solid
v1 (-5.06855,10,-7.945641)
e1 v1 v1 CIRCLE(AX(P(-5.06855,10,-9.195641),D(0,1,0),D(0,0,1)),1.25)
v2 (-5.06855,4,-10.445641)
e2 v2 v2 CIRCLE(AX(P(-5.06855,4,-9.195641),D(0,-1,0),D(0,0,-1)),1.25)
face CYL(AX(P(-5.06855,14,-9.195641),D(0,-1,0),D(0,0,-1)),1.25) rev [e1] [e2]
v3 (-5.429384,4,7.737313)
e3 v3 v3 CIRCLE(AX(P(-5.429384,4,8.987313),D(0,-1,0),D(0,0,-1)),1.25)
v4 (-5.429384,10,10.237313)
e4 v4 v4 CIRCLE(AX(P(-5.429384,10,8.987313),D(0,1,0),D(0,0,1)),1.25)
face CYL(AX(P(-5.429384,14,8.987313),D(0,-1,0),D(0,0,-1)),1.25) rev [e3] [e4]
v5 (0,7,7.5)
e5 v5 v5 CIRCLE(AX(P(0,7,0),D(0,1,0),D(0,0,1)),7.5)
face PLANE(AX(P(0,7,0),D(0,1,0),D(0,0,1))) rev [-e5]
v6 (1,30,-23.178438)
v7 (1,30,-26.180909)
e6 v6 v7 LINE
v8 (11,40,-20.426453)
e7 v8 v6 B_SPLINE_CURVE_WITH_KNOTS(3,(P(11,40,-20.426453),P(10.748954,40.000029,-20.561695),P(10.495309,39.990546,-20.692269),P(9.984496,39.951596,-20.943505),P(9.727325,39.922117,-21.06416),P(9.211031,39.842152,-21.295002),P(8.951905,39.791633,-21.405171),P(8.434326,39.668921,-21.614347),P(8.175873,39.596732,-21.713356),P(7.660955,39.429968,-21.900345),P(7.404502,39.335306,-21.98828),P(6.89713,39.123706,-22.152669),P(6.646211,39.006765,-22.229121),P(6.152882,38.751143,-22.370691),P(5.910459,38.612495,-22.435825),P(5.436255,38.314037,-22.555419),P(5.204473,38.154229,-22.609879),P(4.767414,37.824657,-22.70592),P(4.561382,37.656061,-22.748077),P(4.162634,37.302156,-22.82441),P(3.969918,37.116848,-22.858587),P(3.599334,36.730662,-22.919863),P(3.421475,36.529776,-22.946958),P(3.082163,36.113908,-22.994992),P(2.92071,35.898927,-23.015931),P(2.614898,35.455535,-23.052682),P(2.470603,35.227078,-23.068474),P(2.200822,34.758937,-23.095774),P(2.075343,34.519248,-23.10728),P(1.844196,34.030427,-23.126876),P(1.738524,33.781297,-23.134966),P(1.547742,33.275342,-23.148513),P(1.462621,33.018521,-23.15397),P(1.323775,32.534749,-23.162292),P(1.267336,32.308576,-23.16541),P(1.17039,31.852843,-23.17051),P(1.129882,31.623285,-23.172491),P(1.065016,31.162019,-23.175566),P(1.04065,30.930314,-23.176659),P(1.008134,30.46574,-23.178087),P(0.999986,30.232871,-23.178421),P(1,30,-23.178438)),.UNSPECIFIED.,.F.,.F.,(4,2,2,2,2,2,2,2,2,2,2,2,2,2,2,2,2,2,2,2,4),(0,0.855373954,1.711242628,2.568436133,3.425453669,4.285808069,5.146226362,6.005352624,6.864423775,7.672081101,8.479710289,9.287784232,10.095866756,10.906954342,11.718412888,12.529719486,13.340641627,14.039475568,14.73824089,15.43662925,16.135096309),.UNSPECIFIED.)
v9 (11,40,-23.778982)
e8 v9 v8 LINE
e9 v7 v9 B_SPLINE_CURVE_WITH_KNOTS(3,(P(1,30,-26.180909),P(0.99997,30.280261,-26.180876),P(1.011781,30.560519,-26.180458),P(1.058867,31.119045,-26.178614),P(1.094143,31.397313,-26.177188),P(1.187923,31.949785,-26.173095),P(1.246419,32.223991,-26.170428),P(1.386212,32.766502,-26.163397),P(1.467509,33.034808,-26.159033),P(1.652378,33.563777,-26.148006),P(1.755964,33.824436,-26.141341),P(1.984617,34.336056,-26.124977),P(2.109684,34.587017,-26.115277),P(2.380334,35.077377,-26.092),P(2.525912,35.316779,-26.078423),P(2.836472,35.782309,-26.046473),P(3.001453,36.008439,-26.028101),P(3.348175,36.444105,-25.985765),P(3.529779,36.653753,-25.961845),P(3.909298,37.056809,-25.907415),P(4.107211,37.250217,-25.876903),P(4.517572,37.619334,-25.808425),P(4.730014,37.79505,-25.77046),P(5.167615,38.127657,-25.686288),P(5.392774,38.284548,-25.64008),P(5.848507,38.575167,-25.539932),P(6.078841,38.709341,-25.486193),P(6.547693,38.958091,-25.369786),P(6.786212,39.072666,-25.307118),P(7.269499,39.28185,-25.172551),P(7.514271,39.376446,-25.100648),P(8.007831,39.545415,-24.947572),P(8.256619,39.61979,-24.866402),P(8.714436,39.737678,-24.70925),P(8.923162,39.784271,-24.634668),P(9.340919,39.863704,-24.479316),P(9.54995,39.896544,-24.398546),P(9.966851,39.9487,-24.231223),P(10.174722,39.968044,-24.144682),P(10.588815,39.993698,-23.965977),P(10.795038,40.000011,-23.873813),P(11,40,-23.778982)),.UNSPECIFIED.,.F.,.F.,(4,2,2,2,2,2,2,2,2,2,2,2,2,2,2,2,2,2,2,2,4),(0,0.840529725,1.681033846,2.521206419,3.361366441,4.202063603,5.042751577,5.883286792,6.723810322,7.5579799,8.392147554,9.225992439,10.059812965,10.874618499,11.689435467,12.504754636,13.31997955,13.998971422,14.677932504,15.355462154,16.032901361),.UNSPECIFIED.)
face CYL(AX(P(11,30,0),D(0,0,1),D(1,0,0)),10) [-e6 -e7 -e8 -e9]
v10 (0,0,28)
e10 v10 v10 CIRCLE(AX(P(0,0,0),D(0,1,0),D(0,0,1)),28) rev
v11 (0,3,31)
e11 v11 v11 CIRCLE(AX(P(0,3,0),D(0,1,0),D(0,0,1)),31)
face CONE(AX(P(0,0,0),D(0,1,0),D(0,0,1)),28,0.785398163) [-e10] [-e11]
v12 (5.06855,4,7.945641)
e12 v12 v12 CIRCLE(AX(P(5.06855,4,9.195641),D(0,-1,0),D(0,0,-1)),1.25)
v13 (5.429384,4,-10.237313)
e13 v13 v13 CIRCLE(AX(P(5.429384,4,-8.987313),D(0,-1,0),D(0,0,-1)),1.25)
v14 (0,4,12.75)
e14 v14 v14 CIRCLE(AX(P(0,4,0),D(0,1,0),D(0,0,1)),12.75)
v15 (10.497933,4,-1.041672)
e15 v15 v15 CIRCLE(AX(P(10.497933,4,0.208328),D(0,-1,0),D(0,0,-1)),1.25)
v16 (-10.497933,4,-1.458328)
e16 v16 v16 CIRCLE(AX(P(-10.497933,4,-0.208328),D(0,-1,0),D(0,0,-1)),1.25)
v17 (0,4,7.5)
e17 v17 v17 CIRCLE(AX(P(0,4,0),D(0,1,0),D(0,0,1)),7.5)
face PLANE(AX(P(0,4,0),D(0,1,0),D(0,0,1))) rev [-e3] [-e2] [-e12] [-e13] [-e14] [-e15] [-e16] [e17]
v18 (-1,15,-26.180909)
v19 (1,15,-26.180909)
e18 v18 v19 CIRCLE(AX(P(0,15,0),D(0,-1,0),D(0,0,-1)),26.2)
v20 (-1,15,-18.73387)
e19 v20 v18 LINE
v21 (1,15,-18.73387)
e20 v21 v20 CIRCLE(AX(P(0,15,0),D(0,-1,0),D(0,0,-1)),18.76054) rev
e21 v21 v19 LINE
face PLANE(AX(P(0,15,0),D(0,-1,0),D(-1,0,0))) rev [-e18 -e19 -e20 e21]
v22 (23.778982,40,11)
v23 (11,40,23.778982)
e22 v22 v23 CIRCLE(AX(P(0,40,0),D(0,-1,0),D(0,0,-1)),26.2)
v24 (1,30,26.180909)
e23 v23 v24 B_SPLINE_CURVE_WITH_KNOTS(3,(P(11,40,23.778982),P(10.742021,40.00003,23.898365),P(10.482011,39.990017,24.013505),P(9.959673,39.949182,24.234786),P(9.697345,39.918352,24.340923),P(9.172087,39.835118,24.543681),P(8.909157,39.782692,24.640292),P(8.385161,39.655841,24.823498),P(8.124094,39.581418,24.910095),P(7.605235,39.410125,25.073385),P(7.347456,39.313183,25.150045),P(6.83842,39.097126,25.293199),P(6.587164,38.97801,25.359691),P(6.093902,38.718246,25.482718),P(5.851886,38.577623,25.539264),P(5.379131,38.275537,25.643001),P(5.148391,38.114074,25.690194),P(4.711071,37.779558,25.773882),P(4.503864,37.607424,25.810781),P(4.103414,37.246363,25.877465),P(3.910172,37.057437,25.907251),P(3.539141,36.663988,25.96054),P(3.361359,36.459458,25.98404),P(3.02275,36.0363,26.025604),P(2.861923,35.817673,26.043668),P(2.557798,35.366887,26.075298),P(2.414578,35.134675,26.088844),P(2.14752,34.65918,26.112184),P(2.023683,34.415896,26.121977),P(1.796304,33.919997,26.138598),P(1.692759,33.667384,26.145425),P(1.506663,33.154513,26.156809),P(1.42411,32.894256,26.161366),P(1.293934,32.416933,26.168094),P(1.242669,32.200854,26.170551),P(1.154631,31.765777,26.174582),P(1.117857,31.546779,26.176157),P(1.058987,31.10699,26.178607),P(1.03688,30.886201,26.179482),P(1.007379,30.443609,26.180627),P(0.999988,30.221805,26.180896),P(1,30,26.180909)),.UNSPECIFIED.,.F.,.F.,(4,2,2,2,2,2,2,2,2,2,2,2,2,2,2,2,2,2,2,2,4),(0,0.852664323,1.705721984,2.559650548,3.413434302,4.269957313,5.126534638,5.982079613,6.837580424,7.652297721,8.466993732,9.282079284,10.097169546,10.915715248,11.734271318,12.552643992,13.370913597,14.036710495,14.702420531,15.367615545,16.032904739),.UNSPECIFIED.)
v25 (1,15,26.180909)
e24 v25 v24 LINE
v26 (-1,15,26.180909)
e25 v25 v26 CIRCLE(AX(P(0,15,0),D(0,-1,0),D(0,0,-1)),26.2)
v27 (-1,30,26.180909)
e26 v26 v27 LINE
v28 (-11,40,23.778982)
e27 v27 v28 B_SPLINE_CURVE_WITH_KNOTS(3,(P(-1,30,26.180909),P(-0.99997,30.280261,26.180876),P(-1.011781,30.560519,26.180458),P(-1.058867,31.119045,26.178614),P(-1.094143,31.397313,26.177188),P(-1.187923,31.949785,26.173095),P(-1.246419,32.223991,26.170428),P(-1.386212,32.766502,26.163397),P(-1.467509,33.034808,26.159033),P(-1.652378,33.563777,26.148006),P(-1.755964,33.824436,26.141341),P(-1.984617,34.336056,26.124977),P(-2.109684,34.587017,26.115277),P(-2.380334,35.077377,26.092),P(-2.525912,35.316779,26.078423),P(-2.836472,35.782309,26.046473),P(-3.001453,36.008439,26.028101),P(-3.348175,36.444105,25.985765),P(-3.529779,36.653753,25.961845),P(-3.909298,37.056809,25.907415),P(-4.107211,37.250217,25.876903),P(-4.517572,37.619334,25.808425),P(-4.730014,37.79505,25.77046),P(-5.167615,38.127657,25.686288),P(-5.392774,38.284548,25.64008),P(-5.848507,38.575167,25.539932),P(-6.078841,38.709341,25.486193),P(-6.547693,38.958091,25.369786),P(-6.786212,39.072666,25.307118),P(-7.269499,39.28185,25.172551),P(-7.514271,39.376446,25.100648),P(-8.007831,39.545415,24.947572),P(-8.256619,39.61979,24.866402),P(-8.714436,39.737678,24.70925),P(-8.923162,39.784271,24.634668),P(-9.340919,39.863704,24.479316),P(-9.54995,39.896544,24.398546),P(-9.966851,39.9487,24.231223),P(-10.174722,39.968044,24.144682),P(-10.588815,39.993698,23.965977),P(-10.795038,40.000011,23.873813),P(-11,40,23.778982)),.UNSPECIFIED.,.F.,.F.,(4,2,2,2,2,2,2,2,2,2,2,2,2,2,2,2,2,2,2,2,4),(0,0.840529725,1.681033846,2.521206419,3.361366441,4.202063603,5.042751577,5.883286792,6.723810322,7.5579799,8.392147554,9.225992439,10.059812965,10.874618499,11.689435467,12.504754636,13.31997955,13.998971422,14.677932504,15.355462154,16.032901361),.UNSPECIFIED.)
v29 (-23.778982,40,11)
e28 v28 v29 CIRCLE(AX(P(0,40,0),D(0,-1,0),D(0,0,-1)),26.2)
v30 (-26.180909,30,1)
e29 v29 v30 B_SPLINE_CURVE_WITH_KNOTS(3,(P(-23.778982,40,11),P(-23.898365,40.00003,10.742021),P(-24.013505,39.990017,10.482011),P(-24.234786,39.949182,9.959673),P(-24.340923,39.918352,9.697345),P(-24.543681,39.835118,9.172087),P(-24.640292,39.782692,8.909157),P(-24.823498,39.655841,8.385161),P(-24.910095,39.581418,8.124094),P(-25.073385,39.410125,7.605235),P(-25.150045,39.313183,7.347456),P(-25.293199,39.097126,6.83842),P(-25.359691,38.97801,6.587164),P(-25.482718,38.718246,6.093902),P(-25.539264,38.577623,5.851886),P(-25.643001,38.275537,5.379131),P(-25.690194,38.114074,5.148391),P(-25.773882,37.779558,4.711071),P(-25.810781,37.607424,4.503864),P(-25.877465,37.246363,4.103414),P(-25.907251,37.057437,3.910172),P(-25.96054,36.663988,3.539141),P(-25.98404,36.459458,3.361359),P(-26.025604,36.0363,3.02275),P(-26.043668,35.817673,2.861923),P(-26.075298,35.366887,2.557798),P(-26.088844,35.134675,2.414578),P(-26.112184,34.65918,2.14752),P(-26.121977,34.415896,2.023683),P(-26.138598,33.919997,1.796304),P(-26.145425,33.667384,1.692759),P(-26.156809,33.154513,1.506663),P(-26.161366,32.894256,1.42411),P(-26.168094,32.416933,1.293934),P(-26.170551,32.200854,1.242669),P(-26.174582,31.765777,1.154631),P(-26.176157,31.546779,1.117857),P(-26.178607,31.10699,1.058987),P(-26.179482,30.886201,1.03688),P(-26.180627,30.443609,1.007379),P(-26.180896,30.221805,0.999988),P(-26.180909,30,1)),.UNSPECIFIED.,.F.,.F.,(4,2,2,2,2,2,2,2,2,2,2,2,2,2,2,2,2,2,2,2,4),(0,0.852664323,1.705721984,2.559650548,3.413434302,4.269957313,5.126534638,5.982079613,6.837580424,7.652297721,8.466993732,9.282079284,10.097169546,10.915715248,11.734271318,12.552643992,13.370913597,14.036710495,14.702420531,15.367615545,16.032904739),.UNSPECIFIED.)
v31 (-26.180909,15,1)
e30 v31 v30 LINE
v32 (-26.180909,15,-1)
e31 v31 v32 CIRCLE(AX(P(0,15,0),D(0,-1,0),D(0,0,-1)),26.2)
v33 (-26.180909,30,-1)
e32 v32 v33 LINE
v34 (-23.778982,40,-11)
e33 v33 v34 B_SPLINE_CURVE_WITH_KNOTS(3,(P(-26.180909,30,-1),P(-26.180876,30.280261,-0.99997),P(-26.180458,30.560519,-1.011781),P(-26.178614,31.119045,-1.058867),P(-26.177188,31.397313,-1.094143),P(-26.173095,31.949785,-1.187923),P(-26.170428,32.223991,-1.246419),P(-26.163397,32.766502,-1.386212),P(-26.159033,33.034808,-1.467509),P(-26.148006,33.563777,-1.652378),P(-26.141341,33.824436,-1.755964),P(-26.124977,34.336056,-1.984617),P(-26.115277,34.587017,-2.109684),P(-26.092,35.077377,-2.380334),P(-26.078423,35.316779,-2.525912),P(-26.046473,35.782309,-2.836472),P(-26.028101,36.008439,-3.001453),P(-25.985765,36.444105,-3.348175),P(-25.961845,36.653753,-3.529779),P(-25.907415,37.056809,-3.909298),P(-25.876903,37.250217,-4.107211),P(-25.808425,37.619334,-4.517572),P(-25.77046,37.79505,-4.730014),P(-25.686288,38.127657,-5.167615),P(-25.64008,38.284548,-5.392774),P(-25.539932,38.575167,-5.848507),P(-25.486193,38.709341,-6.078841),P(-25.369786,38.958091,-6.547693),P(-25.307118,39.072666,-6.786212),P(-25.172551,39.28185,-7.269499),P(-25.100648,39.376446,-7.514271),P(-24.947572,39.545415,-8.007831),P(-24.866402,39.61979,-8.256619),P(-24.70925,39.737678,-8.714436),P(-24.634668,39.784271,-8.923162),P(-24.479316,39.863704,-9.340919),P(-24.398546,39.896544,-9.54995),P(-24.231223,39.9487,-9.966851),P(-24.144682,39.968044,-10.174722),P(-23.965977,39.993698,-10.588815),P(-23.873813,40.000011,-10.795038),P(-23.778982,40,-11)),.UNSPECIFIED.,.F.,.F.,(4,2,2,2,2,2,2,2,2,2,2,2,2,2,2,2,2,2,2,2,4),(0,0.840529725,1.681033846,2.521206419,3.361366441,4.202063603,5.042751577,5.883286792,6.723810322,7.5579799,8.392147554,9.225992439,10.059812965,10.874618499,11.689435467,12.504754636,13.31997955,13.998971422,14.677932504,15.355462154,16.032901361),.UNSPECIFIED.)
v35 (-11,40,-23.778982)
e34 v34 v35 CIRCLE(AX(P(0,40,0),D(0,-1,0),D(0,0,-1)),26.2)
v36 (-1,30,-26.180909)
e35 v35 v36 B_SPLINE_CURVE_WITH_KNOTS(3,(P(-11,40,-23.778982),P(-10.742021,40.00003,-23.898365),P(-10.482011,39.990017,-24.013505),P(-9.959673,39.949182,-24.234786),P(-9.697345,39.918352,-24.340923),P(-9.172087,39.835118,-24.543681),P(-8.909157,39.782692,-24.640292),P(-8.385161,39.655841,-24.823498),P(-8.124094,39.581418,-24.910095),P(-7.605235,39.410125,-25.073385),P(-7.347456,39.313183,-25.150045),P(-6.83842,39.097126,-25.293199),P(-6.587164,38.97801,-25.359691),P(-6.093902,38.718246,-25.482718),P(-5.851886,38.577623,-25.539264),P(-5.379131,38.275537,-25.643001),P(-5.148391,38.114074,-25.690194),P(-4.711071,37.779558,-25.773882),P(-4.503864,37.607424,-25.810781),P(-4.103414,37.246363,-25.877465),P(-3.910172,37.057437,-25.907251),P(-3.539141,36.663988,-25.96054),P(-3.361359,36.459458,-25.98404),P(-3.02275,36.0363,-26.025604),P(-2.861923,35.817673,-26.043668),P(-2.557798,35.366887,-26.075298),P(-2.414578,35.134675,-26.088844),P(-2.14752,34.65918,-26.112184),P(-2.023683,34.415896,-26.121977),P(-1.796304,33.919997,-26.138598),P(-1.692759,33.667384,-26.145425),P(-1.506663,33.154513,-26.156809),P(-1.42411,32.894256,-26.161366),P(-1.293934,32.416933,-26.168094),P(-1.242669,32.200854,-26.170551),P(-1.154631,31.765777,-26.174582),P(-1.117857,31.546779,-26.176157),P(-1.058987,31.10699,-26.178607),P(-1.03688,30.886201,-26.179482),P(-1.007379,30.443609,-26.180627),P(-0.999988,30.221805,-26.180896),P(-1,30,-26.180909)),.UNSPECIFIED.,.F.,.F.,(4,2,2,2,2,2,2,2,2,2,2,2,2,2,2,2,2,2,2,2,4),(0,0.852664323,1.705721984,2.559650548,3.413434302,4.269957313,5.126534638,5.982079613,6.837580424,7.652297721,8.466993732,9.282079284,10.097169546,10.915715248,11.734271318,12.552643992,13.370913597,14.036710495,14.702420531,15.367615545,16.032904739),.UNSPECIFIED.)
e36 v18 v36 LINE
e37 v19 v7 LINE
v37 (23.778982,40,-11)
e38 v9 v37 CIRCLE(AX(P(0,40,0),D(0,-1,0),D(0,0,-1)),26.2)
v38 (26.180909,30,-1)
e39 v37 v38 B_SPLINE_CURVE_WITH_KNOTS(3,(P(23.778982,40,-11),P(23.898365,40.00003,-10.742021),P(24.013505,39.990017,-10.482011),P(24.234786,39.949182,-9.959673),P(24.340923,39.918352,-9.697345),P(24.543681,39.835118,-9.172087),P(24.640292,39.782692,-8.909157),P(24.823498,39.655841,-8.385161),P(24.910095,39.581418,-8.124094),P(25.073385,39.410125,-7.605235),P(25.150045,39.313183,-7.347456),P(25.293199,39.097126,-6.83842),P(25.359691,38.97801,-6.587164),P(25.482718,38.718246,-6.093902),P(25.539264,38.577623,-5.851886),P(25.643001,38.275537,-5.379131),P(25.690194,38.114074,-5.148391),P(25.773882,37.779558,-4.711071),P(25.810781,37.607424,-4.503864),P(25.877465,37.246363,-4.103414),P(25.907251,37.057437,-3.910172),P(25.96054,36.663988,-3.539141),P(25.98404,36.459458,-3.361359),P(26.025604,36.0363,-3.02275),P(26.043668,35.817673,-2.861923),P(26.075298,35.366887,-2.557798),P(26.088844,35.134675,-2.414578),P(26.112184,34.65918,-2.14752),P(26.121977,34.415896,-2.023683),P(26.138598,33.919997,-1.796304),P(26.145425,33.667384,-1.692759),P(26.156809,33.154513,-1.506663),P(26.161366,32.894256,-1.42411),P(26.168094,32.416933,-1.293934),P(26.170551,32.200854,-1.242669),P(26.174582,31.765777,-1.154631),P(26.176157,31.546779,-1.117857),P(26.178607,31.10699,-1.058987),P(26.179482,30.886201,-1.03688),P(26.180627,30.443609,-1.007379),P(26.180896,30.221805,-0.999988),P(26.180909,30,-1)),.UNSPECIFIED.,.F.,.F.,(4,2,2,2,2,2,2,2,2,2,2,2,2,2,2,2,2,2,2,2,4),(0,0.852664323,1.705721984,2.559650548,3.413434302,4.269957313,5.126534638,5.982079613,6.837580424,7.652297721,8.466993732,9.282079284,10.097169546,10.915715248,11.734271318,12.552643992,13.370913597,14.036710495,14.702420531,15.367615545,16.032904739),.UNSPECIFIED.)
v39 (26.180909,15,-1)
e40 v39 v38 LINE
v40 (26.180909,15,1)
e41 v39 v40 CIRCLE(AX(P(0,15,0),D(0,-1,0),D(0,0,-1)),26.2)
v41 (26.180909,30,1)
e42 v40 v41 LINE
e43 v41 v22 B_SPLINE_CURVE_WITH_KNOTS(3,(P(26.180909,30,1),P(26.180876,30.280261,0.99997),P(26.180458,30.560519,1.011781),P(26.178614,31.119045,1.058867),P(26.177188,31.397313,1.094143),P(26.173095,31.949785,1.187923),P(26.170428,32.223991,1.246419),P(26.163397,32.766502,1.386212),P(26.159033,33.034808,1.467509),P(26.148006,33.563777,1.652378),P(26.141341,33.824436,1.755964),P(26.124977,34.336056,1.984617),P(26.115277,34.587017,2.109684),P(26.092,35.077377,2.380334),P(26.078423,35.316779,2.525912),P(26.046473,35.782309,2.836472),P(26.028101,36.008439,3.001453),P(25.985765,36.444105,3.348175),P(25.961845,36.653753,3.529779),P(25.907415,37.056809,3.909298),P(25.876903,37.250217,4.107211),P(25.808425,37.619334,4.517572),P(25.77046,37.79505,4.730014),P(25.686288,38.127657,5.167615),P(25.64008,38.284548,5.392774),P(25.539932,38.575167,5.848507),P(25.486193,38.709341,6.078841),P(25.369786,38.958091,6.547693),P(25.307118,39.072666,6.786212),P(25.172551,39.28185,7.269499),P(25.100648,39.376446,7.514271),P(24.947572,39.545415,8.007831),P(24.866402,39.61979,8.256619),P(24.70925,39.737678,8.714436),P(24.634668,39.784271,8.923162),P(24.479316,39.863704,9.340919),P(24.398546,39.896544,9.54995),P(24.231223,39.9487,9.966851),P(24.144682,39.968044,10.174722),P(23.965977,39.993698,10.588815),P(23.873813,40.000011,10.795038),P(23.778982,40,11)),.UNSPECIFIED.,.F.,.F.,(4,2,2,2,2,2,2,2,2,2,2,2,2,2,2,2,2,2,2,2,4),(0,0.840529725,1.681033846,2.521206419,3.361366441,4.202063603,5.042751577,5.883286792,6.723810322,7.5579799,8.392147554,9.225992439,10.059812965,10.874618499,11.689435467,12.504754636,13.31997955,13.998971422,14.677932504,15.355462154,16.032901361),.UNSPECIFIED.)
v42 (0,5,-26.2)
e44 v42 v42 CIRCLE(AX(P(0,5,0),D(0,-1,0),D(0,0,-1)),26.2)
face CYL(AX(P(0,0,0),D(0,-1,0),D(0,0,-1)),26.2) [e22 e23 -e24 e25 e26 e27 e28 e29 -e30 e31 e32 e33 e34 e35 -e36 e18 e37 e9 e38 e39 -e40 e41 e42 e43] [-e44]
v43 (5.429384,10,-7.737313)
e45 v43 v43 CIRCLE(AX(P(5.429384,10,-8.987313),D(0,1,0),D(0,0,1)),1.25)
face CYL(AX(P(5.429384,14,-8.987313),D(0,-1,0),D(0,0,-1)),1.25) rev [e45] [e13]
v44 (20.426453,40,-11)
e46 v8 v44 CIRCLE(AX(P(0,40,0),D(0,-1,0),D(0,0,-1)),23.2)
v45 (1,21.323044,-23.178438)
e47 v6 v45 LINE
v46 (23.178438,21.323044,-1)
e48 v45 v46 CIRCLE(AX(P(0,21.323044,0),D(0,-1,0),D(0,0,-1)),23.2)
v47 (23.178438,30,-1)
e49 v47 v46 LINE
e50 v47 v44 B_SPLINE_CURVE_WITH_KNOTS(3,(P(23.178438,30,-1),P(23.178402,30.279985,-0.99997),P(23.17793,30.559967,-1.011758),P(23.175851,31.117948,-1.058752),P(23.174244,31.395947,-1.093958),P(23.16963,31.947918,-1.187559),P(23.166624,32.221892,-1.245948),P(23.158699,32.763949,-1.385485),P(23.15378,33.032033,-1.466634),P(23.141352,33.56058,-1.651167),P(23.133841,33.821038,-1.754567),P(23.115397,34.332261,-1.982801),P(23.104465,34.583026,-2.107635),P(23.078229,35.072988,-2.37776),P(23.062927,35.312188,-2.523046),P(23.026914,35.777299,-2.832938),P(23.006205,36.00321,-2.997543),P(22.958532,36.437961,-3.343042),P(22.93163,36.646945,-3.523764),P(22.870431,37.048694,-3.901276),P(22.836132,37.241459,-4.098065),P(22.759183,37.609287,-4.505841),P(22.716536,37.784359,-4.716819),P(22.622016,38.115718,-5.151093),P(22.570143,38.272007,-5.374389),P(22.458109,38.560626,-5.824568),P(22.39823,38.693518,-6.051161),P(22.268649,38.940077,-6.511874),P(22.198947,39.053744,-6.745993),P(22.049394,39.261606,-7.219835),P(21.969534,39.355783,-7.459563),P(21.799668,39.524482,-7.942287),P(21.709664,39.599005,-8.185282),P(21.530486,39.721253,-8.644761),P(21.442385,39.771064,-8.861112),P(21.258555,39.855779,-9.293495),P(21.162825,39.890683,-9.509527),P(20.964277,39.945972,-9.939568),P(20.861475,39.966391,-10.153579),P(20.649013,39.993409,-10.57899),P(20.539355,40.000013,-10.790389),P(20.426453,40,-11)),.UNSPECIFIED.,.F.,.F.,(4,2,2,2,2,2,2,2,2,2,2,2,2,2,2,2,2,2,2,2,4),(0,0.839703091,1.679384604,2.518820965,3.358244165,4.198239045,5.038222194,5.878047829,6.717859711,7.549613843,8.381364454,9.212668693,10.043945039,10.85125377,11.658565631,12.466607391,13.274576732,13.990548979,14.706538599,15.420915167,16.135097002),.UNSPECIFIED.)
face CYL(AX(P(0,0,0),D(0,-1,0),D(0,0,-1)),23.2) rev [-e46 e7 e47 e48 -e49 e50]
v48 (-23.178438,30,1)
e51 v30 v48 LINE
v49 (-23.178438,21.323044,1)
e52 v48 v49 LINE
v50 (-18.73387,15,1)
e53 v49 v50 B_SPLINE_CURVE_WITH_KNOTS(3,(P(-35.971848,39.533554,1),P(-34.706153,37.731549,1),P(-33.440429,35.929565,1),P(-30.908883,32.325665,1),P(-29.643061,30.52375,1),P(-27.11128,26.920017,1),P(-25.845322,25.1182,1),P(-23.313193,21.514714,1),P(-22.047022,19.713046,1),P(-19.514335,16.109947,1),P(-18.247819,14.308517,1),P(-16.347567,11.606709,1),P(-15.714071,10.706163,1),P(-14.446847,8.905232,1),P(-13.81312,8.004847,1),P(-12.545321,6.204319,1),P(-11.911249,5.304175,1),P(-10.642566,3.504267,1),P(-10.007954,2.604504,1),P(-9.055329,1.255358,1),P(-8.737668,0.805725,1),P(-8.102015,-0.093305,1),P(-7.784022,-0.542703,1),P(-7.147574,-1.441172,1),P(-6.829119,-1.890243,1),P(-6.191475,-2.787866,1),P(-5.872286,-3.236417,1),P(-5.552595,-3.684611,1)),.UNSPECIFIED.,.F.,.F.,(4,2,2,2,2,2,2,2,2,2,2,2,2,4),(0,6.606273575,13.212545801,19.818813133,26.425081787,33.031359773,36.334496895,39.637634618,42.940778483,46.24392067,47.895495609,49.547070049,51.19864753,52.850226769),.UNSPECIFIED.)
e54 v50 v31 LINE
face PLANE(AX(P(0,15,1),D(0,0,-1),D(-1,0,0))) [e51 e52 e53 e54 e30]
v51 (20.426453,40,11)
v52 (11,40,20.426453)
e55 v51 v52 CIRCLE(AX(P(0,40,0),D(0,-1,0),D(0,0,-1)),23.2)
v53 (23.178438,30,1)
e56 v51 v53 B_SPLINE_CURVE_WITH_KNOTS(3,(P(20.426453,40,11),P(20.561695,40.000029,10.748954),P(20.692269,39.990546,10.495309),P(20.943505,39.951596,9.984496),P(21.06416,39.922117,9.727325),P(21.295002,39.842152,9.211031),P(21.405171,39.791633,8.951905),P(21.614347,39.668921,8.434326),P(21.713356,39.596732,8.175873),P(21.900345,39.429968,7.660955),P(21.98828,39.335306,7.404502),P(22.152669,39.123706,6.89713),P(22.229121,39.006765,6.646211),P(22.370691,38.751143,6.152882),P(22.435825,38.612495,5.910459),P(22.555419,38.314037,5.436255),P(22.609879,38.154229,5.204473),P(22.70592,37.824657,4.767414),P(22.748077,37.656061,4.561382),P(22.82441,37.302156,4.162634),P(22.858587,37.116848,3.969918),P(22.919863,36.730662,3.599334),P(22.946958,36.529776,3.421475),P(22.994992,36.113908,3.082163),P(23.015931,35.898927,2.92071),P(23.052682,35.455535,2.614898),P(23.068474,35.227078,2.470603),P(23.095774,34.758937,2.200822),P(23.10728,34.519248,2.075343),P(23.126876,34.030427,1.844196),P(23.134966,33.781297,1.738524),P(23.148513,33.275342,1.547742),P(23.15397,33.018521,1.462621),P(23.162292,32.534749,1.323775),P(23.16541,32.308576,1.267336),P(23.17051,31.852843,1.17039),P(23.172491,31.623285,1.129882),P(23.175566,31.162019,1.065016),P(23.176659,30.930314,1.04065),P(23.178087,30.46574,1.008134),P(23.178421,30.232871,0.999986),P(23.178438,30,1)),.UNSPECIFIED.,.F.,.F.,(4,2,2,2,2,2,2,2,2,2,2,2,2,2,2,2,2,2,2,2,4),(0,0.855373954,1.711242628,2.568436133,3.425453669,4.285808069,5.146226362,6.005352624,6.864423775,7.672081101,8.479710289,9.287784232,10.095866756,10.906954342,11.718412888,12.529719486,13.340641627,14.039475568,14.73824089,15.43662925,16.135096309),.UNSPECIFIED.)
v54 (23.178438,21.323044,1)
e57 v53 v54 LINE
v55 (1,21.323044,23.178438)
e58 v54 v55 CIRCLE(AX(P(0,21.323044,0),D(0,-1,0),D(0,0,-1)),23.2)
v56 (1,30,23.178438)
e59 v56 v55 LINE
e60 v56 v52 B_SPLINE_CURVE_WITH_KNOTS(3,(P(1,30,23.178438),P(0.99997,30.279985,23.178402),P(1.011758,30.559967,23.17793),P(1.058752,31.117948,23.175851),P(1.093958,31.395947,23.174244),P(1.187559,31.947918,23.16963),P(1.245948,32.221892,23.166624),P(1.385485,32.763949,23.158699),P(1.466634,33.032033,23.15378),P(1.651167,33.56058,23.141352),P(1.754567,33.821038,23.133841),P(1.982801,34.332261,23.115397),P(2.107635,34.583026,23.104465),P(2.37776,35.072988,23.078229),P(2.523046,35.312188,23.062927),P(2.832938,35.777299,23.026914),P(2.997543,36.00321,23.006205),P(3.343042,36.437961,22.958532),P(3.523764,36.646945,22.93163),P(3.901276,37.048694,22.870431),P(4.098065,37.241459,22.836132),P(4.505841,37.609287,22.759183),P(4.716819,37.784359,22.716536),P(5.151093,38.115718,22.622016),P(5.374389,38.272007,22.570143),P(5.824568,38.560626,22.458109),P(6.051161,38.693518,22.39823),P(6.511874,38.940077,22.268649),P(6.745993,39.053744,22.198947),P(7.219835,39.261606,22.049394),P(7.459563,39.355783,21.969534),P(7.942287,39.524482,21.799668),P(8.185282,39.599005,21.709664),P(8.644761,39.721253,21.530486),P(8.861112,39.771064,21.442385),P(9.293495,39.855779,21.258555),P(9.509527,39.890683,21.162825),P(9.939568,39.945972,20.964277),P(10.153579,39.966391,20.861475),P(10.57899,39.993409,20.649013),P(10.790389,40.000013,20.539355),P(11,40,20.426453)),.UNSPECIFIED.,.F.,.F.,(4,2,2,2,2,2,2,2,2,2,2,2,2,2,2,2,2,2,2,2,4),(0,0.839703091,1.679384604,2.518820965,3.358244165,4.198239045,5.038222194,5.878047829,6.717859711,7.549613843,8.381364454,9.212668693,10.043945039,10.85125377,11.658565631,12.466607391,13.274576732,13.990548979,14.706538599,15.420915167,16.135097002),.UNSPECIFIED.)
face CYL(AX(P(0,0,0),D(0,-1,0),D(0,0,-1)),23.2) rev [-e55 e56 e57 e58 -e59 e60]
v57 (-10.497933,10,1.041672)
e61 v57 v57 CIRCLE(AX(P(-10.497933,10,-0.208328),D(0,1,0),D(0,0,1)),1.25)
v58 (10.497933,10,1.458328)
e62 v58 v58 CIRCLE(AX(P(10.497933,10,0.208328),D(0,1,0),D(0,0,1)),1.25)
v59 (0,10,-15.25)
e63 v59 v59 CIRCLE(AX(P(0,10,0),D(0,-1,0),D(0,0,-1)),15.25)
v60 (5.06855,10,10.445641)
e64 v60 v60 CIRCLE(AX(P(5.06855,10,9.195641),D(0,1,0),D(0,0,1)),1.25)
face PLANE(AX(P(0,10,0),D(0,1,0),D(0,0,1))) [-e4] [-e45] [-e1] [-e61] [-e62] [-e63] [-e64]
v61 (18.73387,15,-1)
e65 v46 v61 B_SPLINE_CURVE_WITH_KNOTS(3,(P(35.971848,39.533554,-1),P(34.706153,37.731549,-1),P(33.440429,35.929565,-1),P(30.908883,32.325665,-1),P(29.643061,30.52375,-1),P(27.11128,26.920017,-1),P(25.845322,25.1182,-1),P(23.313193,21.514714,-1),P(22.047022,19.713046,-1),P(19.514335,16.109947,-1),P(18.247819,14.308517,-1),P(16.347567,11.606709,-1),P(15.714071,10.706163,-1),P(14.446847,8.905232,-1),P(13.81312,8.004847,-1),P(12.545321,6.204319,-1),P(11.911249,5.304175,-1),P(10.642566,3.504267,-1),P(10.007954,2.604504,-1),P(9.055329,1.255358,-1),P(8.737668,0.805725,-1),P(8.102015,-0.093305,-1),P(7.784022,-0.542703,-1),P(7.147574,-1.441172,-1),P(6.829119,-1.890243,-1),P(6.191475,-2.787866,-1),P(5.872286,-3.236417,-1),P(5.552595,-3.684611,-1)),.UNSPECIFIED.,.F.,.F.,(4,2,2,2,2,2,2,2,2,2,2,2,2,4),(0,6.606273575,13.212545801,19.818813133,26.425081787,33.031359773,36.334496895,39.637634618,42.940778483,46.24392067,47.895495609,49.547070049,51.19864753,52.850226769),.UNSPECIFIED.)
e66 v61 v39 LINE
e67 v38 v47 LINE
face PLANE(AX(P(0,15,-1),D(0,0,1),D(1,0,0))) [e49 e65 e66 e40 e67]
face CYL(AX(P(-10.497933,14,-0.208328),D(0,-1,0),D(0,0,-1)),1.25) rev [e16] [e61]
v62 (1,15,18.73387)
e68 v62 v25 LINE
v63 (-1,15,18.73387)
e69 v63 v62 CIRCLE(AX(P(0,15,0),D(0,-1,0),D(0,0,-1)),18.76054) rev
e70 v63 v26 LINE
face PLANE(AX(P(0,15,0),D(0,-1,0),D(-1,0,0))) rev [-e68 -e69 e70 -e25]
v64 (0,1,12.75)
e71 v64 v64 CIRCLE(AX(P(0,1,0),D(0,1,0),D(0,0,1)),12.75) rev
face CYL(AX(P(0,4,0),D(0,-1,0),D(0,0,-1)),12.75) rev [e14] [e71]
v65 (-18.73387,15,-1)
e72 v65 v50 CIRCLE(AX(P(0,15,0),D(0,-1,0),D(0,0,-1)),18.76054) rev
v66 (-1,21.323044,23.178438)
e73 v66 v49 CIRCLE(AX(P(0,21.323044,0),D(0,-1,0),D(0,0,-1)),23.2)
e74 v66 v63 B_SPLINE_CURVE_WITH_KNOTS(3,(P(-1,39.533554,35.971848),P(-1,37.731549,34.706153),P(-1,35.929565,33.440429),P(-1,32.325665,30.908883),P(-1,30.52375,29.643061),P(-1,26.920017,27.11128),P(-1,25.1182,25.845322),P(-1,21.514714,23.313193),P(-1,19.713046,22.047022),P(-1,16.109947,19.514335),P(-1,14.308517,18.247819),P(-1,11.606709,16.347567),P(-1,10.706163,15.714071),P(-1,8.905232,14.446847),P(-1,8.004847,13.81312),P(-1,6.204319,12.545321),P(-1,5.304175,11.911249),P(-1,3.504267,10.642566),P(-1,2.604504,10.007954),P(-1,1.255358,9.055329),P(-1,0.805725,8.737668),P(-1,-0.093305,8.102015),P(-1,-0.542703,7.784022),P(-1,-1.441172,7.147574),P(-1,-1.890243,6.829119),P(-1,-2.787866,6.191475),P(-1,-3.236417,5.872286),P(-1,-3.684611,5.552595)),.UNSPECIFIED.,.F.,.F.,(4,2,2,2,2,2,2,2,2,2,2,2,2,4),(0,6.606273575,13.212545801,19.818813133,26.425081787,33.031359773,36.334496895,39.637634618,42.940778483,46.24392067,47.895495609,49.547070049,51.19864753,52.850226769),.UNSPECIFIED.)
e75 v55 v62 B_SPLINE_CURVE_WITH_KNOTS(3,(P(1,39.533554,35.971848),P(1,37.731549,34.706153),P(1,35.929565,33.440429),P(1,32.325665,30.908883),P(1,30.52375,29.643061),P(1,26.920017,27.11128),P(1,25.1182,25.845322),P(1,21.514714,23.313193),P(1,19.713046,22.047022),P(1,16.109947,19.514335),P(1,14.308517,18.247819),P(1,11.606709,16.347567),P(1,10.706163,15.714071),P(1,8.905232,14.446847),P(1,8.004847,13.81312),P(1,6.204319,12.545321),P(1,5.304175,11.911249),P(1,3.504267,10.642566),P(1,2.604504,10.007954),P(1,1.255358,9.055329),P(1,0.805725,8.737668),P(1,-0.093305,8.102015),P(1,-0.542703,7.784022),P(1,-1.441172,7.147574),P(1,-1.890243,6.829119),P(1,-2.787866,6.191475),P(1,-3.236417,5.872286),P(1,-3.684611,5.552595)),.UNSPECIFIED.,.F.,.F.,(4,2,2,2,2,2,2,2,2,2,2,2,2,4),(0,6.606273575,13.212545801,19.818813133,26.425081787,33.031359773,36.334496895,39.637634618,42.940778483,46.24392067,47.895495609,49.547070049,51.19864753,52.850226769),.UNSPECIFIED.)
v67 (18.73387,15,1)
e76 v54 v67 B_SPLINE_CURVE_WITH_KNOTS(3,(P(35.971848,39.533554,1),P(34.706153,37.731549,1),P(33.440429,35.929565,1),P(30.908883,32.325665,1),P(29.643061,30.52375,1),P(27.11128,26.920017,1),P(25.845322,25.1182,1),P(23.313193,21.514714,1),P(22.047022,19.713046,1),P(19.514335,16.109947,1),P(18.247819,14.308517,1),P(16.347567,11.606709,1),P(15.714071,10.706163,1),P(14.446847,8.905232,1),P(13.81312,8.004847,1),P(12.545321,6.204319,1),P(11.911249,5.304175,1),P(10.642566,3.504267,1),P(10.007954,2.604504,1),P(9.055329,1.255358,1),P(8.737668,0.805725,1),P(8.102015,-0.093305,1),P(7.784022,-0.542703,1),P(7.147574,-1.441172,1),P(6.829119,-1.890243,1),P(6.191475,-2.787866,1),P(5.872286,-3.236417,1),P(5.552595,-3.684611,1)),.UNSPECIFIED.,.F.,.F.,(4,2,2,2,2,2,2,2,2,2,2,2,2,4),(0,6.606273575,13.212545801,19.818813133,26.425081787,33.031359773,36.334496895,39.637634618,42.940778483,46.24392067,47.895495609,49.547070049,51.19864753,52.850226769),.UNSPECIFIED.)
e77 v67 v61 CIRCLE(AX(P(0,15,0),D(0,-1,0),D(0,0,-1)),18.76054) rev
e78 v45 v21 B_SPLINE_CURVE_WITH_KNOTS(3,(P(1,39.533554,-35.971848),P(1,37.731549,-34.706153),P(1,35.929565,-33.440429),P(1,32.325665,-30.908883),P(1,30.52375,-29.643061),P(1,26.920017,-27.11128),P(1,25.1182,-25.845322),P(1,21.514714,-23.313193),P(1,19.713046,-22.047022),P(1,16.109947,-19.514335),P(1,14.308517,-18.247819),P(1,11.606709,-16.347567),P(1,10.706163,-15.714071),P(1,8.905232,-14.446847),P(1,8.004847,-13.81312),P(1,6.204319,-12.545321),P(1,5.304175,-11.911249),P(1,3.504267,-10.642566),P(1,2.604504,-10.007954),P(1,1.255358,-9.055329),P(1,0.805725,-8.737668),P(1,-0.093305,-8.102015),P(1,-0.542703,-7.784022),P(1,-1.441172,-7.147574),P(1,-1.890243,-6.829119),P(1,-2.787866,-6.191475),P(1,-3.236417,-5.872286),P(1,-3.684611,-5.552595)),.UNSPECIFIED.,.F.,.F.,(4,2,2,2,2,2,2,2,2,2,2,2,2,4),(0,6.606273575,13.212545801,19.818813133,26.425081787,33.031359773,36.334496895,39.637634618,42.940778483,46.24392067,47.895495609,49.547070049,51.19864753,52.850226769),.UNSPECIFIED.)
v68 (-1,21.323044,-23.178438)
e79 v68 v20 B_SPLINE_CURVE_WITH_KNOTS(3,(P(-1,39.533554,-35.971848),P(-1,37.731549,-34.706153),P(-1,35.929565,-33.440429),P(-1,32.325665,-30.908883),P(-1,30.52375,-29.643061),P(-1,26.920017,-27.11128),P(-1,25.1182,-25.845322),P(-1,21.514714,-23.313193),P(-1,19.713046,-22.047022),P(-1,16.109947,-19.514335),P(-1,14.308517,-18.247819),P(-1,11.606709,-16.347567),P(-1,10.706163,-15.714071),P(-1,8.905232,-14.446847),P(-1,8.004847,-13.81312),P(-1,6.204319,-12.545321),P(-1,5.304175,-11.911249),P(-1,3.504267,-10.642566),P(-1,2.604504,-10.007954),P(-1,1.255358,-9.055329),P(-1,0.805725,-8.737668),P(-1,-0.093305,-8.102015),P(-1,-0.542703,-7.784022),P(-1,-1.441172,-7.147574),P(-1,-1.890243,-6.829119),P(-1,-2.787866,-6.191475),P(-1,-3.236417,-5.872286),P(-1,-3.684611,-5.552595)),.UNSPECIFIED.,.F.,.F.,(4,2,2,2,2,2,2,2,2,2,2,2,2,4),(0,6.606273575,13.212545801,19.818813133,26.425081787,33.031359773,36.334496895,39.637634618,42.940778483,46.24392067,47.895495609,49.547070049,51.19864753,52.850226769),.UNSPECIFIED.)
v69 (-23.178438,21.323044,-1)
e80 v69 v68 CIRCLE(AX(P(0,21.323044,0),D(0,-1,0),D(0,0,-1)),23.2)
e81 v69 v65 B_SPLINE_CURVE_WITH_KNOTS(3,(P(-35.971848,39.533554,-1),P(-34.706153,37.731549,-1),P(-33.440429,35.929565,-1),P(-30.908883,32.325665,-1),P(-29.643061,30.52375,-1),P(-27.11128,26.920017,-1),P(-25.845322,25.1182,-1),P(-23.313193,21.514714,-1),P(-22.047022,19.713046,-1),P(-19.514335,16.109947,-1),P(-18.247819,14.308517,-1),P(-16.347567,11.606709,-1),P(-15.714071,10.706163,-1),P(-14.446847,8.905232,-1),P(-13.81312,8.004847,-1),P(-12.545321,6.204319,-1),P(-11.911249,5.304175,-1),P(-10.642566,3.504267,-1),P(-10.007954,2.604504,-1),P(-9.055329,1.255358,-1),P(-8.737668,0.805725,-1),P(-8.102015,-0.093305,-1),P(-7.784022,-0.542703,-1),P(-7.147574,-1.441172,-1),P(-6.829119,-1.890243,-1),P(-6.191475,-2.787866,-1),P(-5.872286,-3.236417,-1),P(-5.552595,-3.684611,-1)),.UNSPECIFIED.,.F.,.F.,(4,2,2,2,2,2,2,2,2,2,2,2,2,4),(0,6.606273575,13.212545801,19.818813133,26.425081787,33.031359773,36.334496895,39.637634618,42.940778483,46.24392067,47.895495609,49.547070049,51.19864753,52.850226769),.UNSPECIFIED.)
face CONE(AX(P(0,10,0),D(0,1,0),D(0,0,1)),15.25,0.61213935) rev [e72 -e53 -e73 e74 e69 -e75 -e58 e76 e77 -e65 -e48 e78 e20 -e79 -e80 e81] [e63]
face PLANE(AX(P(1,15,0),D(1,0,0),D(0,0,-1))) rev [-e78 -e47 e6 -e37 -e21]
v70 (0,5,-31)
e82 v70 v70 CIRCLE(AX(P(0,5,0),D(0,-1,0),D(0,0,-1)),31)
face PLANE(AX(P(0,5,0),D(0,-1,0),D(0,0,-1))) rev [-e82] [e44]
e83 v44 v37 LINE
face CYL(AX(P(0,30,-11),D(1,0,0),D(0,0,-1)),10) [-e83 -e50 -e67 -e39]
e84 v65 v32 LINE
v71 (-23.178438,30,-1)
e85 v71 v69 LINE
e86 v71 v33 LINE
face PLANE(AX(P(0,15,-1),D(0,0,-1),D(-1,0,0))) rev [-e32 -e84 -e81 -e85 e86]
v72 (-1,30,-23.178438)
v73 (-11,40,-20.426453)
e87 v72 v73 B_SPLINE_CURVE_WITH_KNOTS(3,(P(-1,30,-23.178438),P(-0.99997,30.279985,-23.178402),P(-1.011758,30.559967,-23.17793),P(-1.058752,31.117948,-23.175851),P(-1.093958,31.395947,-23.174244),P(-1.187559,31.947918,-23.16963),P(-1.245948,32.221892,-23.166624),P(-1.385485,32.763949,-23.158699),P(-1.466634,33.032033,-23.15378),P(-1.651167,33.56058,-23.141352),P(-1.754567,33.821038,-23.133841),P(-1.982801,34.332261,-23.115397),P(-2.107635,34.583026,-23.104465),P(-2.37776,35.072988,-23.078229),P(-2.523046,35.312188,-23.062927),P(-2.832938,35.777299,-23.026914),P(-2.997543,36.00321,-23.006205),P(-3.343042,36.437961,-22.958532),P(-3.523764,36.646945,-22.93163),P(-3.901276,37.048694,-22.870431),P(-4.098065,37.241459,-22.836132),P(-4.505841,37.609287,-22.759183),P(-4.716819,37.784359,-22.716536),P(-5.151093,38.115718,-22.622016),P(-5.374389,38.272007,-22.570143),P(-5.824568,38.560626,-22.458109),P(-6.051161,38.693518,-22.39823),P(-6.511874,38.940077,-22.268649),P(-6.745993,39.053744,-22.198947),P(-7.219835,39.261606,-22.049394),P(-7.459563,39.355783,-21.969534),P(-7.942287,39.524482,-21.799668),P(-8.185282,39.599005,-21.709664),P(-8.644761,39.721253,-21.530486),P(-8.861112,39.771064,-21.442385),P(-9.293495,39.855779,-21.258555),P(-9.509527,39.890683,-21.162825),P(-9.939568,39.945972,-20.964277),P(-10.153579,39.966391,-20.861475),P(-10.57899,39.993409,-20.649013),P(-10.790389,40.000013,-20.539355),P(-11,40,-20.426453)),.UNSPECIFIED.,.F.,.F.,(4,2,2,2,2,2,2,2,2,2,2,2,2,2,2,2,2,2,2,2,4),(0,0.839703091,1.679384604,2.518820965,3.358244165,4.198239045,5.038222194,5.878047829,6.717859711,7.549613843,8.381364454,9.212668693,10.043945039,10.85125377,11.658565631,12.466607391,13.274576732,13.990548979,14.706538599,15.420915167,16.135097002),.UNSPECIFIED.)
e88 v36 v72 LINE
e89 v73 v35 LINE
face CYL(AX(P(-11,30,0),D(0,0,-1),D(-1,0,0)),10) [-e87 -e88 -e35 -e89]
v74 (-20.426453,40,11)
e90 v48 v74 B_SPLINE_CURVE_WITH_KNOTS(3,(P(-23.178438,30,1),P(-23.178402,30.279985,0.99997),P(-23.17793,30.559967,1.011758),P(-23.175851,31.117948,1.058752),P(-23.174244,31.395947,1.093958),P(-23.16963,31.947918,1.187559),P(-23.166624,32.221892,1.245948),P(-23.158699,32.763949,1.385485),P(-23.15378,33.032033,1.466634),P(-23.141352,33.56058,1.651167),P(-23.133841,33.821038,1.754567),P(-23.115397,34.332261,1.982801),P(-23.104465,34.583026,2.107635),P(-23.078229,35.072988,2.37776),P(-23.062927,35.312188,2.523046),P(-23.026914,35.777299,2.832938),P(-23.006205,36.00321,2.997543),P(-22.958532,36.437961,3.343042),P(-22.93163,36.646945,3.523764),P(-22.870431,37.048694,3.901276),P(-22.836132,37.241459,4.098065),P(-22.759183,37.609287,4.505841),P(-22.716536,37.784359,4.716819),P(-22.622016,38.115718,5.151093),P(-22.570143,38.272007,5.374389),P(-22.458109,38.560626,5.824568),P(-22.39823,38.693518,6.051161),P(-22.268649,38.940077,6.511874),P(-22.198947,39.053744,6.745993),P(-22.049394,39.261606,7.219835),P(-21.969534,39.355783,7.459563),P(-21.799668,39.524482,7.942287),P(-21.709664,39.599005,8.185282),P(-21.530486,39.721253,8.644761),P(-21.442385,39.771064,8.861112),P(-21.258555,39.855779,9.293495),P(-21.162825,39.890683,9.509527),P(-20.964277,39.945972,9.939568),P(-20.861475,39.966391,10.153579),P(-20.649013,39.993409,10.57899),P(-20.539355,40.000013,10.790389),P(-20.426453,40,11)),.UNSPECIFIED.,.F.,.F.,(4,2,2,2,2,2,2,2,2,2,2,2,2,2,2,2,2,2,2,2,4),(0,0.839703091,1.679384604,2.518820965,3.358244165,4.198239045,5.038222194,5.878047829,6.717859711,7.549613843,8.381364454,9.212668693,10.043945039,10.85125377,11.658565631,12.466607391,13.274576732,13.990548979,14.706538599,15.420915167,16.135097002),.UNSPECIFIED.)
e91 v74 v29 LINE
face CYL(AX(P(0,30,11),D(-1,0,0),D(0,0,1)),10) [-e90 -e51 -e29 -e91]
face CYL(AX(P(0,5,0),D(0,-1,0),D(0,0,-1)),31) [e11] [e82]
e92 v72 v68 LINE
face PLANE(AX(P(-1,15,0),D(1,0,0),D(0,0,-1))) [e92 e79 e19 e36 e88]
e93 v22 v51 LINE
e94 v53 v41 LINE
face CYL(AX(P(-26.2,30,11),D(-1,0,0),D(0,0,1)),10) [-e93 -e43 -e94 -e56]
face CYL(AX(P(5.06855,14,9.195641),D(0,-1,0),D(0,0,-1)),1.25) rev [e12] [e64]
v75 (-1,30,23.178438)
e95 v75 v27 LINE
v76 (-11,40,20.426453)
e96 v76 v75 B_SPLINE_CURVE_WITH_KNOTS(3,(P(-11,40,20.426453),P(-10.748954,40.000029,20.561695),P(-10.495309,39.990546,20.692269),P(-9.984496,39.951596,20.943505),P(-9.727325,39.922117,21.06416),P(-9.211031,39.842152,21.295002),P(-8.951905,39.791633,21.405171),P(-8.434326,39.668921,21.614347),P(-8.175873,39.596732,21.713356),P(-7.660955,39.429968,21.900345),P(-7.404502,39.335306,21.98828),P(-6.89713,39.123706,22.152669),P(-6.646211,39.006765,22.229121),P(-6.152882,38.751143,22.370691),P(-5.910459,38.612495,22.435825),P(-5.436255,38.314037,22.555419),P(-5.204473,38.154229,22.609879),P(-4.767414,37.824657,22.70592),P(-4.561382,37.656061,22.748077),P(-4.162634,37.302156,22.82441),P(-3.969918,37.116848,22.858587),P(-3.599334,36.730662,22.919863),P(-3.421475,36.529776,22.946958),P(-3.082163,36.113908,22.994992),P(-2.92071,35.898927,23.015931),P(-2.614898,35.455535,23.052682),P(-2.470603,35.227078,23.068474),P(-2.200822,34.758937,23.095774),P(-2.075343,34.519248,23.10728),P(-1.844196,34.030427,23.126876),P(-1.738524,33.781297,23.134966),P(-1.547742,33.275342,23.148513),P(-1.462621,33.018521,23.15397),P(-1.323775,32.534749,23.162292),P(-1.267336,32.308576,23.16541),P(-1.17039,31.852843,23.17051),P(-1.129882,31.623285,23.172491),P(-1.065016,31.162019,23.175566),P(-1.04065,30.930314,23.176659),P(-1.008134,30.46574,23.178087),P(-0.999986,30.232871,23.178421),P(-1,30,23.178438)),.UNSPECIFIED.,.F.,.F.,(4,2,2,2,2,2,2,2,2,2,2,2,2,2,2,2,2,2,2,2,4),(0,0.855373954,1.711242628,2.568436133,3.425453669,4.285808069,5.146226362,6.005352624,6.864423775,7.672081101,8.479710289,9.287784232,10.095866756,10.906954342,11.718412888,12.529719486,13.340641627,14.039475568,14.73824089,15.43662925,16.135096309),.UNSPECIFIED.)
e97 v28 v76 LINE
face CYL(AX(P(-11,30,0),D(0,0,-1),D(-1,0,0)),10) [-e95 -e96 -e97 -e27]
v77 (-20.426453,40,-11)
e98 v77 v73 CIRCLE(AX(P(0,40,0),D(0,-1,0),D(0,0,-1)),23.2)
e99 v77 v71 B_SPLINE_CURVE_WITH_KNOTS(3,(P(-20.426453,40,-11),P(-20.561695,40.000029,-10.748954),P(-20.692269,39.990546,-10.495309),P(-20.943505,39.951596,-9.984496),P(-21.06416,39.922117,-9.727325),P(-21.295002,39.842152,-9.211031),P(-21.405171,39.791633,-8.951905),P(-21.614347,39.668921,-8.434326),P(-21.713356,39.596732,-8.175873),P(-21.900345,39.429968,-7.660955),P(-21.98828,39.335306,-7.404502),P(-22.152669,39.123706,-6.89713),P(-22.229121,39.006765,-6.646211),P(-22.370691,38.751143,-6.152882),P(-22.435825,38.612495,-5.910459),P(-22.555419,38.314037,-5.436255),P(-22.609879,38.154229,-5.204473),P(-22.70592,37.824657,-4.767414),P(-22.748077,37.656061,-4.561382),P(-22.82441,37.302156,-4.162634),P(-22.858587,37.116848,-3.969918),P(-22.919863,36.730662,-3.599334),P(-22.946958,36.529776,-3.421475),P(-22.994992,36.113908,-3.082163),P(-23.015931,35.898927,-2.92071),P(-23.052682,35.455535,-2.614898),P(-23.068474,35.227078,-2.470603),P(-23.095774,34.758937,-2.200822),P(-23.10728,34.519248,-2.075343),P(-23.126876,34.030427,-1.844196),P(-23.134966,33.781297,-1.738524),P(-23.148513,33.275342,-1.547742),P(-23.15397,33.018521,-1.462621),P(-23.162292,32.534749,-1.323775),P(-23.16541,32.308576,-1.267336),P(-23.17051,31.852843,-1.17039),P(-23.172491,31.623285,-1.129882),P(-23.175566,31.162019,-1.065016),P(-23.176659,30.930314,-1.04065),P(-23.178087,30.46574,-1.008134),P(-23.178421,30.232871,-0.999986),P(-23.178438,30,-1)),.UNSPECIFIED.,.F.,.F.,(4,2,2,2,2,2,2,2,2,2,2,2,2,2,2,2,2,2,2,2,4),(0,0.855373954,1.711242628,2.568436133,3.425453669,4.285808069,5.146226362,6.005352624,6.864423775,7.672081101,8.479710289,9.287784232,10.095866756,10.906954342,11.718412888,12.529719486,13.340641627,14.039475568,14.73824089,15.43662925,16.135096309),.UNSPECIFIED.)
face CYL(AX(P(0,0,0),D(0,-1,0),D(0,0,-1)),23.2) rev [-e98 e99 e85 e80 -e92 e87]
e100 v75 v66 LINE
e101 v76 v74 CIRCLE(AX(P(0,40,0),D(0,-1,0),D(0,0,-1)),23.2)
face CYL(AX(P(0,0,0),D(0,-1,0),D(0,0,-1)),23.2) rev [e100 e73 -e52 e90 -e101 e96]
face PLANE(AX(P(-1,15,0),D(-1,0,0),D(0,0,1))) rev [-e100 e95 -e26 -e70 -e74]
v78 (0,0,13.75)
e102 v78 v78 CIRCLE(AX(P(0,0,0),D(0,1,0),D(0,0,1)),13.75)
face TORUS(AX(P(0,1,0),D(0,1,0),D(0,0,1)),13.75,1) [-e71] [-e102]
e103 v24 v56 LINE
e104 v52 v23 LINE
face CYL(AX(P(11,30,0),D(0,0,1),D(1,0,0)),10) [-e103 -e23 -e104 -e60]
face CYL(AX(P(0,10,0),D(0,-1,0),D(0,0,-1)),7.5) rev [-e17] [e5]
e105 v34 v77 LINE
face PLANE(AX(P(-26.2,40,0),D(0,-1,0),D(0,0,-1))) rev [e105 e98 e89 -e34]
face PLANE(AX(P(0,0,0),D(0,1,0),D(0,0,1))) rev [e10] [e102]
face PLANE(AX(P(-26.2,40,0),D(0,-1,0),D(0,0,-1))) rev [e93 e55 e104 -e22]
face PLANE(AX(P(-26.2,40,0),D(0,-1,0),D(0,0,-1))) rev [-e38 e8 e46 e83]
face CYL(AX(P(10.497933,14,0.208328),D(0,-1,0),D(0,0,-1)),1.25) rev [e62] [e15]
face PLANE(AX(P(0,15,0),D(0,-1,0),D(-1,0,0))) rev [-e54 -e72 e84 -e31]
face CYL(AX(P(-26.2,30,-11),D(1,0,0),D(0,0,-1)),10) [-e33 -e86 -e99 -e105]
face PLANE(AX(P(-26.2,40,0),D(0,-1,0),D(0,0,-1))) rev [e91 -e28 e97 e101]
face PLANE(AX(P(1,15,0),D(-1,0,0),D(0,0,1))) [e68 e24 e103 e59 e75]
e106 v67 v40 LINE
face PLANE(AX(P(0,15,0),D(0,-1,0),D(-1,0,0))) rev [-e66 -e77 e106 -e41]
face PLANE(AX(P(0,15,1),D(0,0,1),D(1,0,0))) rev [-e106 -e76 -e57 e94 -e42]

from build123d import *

# Parameters (mm, degrees)
SKETCH1_R               = 15.25
SKETCH1_R_2             = 12.75
BOSS_EXTRUDE1_DEPTH     = 4
SKETCH2_R               = 15.25
SKETCH2_R_2             = 7.5
BOSS_EXTRUDE2_DEPTH     = 6
BOSS_EXTRUDE3_START     = -3
SKETCH3_R               = 15.25
BOSS_EXTRUDE3_DEPTH     = 3
SKETCH4_R               = 1.25
CUT_EXTRUDE1_DEPTH      = 10
CUT_EXTRUDE_THIN1_START = -70
CUT_EXTRUDE_THIN1_DEPTH = 25
SKETCH7_R               = 31
SKETCH7_R_2             = 26
BOSS_EXTRUDE4_DEPTH     = 5
CHAMFER3_SIZE           = 3
FILLET3_R               = 1
FILLET4_R               = 10


with BuildPart() as part:
    # Sketch1 → Boss-Extrude1 (new body)
    with BuildSketch(Plane(origin=(0, 0, 0), x_dir=(1, 0, 0), z_dir=(0, 1, 0))):
        with Locations(Location((0, 0, 0), (0, 0, 270))):
            Circle(SKETCH1_R)
        with Locations(Location((0, 0, 0), (0, 0, 270))):
            Circle(SKETCH1_R_2, mode=Mode.SUBTRACT)
    extrude(amount=BOSS_EXTRUDE1_DEPTH)

    # Sketch2 → Boss-Extrude2 (add)
    with BuildSketch(Plane(origin=(0, 4, 0), x_dir=(1, 0, 0), z_dir=(0, 1, 0))):
        with Locations(Location((0, 0, 0), (0, 0, 270))):
            Circle(SKETCH2_R)
        with Locations(Location((0, 0, 0), (0, 0, 270))):
            Circle(SKETCH2_R_2, mode=Mode.SUBTRACT)
    extrude(amount=BOSS_EXTRUDE2_DEPTH)

    # Sketch3 → Boss-Extrude3 (add)
    with BuildSketch(Plane(origin=(0, 10, 0), x_dir=(1, 0, 0), z_dir=(0, 1, 0)).offset(BOSS_EXTRUDE3_START)):
        with Locations(Location((0, 0, 0), (0, 0, 270))):
            Circle(SKETCH3_R)
    extrude(amount=BOSS_EXTRUDE3_DEPTH)

    # Sketch4 → Cut-Extrude1 (cut)
    with BuildSketch(Plane(origin=(0, 4, 0), x_dir=(-1, 0, 0), z_dir=(0, -1, 0))):
        with Locations(Location((5.42938356, -8.987312955, 0), (0, 0, 90))):
            Circle(SKETCH4_R)
        with Locations(Location((-5.068549551, -9.195640568, 0), (0, 0, 90))):
            Circle(SKETCH4_R)
        with Locations(Location((-10.497933111, -0.208327612, 0), (0, 0, 90))):
            Circle(SKETCH4_R)
        with Locations(Location((-5.42938356, 8.987312955, 0), (0, 0, 90))):
            Circle(SKETCH4_R)
        with Locations(Location((5.068549551, 9.195640568, 0), (0, 0, 90))):
            Circle(SKETCH4_R)
        with Locations(Location((10.497933111, 0.208327612, 0), (0, 0, 90))):
            Circle(SKETCH4_R)
    extrude(amount=-CUT_EXTRUDE1_DEPTH, mode=Mode.SUBTRACT)

    # Sketch5 → Revolve1 (revolve)
    with BuildSketch(Plane.XY, mode=Mode.PRIVATE) as revolve1_sk:
        Polygon((-15.25, 0), (-26.2, 0), (-26.2, 20), (-26.2, 40), (-23.2, 40), (-23.2, 21.323043804), (-15.25, 10), align=None)
    revolve(revolve1_sk.sketch.rotate(Axis((0, 0, 0), (0, 1, 0)), 270), axis=Axis((0, 0, 0), (0, 1, 0)))

    # Cut-Extrude-Thin1: read off the stored shape, not the designer's step
    # Cut-Extrude-Thin1 outline → Cut-Extrude-Thin1 (cut)
    with BuildSketch(Plane(origin=(0, 85, 0), x_dir=(1, 0, 0), z_dir=(0, 1, 0)).offset(CUT_EXTRUDE_THIN1_START)):
        with BuildLine():
            Line((1, 1), (1, 26.180909075))
            ThreePointArc((1, 26.180909075), (0, 26.2), (-1, 26.180909075))
            Line((-1, 26.180909075), (-1, 1))
            Line((-1, 1), (1, 1))
        make_face()
        with BuildLine():
            Line((1, 1), (1, -1))
            Line((1, -1), (26.180909075, -1))
            ThreePointArc((26.180909075, -1), (26.2, 0), (26.180909075, 1))
            Line((26.180909075, 1), (1, 1))
        make_face()
        with BuildLine():
            Line((1, -1), (-1, -1))
            Line((-1, -1), (-1, -26.180909075))
            ThreePointArc((-1, -26.180909075), (0, -26.2), (1, -26.180909075))
            Line((1, -26.180909075), (1, -1))
        make_face()
        with BuildLine():
            Line((-1, -1), (-1, 1))
            Line((-1, 1), (-26.180909075, 1))
            ThreePointArc((-26.180909075, 1), (-26.2, 0), (-26.180909075, -1))
            Line((-26.180909075, -1), (-1, -1))
        make_face()
    extrude(amount=CUT_EXTRUDE_THIN1_DEPTH, mode=Mode.SUBTRACT)

    # Sketch7 → Boss-Extrude4 (add)
    with BuildSketch(Plane(origin=(0, 0, 0), x_dir=(-1, 0, 0), z_dir=(0, -1, 0))):
        with Locations(Location((0, 0, 0), (0, 0, 90))):
            Circle(SKETCH7_R)
        Circle(SKETCH7_R_2, mode=Mode.SUBTRACT)
    extrude(amount=-BOSS_EXTRUDE4_DEPTH)

    # Chamfer3
    chamfer3_edges = [part.edges().sort_by_distance(p)[0] for p in [
        (0, 0, 31),
    ]]
    chamfer(chamfer3_edges, length=CHAMFER3_SIZE)

    # Fillet3
    fillet3_edges = [part.edges().sort_by_distance(p)[0] for p in [
        (0, 0, -12.75),
    ]]
    fillet(fillet3_edges, radius=FILLET3_R)

    # Fillet4
    fillet4_edges = [part.edges().sort_by_distance(p)[0] for p in [
        (24.679673666, 40, 1),
        (-24.679673666, 40, -1),
        (-1, 40, 24.679673666),
        (1, 40, -24.679673666),
        (24.679673666, 40, -1),
        (-24.679673666, 40, 1),
        (1, 40, 24.679673666),
        (-1, 40, -24.679673666),
    ]]
    fillet(fillet4_edges, radius=FILLET4_R)


solid = part.part
